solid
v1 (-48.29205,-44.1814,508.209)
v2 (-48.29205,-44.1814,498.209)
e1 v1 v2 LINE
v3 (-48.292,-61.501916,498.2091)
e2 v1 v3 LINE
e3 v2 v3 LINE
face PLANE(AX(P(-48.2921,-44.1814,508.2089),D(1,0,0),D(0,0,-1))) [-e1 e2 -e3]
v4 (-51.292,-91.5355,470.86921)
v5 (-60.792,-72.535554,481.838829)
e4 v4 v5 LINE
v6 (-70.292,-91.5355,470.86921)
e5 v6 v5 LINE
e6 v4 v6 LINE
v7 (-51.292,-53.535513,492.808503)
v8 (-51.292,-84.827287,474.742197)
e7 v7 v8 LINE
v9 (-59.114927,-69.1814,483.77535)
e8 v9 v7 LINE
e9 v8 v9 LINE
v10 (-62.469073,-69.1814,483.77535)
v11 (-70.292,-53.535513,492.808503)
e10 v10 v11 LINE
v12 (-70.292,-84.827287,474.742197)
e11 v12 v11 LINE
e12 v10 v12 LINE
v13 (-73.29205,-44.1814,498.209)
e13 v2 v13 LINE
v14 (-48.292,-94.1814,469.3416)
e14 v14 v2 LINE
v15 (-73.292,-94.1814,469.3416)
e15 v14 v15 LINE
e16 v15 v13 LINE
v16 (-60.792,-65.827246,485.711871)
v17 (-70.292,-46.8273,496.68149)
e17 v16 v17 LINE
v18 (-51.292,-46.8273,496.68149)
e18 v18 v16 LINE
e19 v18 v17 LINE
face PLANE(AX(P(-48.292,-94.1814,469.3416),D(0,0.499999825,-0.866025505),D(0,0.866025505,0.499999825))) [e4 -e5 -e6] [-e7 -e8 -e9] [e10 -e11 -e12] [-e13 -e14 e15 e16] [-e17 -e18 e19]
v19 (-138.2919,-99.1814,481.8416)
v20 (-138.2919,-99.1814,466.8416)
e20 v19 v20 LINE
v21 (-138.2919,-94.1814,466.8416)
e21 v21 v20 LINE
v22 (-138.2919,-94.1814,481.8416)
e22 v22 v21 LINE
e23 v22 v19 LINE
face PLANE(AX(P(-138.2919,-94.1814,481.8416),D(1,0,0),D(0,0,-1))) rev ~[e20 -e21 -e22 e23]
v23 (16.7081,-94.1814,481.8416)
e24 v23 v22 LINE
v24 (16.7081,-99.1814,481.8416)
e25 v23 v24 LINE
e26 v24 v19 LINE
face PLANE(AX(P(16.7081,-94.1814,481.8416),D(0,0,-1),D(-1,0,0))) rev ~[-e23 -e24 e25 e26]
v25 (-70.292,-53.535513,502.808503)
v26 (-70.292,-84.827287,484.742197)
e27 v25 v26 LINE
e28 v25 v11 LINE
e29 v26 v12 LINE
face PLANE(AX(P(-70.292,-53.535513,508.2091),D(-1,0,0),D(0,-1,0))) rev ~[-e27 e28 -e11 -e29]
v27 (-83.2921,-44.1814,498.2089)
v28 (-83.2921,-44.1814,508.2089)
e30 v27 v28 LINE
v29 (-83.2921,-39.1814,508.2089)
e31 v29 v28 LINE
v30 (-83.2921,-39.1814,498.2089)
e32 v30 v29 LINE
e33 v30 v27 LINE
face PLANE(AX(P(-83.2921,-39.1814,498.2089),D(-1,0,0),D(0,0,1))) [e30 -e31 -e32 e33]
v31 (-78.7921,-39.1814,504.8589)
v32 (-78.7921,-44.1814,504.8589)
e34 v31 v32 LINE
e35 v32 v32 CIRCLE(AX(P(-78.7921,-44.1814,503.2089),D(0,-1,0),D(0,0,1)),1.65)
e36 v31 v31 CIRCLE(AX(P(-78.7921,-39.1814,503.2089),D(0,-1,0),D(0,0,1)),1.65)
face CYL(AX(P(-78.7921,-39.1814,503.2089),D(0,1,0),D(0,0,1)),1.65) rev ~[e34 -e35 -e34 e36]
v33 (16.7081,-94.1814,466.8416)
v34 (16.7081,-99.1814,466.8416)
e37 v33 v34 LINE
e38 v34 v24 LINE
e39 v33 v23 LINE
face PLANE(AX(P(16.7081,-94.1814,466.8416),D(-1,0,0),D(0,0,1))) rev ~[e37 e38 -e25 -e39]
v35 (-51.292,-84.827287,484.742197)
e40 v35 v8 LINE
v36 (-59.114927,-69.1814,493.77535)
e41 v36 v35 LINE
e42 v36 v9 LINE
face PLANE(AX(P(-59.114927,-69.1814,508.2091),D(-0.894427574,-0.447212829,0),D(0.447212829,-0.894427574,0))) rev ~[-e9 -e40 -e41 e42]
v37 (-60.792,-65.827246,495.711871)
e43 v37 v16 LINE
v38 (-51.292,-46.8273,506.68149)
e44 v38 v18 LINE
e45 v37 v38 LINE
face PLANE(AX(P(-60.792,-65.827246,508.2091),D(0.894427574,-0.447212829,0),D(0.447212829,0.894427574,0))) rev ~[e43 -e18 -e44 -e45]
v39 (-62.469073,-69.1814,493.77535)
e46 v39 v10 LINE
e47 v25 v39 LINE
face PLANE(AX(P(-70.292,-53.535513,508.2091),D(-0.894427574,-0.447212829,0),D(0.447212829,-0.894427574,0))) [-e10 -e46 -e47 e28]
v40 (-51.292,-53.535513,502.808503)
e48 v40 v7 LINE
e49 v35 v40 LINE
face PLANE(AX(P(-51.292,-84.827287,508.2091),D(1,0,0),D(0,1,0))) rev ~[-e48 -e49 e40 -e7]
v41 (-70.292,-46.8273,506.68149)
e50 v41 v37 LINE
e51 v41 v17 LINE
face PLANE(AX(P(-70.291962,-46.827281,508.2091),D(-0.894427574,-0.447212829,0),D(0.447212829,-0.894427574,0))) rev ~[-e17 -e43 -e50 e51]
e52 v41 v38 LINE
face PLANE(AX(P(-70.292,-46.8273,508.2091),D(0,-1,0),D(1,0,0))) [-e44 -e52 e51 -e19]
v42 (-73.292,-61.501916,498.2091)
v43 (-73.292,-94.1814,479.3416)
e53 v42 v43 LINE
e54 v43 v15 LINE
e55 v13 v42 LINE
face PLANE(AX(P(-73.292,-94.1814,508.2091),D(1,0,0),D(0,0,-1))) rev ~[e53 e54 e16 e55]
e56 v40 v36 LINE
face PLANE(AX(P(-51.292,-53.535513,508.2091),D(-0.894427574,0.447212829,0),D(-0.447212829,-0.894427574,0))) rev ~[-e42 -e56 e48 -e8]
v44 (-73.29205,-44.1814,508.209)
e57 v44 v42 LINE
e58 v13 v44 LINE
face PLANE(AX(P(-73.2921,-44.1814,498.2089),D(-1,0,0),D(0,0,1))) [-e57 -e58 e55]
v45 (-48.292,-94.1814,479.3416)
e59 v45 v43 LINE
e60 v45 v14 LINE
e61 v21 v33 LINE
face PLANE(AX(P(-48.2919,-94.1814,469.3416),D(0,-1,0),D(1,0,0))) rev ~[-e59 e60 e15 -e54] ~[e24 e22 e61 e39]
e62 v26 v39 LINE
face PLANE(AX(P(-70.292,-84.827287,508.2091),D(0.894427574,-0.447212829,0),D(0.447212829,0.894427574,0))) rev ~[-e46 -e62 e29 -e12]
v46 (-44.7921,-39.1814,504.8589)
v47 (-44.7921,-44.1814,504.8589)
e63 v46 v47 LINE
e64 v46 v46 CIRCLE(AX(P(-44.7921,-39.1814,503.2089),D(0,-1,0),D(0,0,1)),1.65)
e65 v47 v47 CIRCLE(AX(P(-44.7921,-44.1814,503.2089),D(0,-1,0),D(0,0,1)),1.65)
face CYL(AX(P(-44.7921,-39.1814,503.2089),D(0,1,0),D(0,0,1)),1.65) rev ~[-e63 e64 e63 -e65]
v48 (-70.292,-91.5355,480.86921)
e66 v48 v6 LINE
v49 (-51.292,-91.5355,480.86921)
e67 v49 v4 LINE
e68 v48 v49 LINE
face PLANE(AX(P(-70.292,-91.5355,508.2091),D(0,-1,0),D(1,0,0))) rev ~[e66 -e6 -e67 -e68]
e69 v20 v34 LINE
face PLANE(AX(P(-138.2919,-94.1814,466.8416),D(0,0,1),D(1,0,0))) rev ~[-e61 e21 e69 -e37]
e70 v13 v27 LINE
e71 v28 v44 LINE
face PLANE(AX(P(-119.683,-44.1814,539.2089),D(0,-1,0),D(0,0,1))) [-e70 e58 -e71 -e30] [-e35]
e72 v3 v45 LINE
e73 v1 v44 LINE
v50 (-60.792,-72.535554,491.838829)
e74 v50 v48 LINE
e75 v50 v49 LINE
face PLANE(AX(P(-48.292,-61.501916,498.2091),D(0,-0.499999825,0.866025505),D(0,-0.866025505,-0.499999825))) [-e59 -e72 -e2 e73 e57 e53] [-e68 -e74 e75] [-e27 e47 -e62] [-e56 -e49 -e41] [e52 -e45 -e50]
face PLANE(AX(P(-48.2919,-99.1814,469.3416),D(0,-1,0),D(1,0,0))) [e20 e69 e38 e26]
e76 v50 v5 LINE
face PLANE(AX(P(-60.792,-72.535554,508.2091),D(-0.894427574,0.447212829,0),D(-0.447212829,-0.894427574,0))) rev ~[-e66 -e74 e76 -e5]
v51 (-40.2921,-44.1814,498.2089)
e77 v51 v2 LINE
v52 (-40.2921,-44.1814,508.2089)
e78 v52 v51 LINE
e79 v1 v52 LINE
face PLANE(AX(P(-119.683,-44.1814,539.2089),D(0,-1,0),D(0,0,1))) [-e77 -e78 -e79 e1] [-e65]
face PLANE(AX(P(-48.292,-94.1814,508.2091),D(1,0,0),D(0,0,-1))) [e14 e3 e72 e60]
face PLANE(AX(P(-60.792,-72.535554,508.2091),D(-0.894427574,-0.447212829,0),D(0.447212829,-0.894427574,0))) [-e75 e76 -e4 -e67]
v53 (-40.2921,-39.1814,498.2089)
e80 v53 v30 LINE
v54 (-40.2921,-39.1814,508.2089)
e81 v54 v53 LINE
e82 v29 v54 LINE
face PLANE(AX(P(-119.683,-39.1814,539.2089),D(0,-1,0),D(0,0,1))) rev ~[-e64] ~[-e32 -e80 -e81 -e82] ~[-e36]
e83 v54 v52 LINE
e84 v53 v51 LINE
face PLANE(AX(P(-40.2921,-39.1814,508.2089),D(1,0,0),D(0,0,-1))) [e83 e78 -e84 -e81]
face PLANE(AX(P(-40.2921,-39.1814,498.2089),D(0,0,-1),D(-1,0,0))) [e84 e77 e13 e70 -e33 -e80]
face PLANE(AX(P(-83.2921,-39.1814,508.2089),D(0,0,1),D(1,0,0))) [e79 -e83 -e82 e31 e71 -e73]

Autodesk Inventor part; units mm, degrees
ref_plane "YZ Plane" through (0, 0, 0) normal (1, 0, 0) x (0, 1, 0)
ref_plane "XZ Plane" through (0, 0, 0) normal (0, 1, 0) x (-1, 0, 0)
ref_plane "XY Plane" through (0, 0, 0) normal (0, 0, 1) x (1, 0, 0)
ref_plane "工作平面2" through (-119.683, -39.1814, 539.2089) normal (0, -1, 0) x (-0.0000021, 0, 1)
sketch "草图2" plane through (-119.683, -39.1814, 539.2089) normal (0, -1, 0) x (-0.0000021, 0, 1)
  line L0 (-31, -79.3909) -> (-41, -79.3909)
  line L1 (-41, -79.3909) -> (-41, -36.3909)
  line L2 (-41, -36.3909) -> (-31, -36.3909)
  line L3 (-31, -36.3909) -> (-31, -79.3909)
  circle A0 centre (-36, -74.8909) radius 1.65 projected
  circle A1 centre (-36, -40.8909) radius 1.65 projected
  point P0 (-539.2092, -119.6818)
  point P1 (0, 0)
  dimension "d0" = 10
  dimension "d1" = 43
  dimension "d2" = 5
  dimension "d3" = 4.5
extrude "拉伸1" add sketch "草图2" along normal blind 5
ref_plane "工作平面3" through (-119.683, -44.1814, 539.2089) normal (0, -1, 0) x (1, 0, 0.0000021)
sketch "草图4" plane through (-119.683, -44.1814, 539.2089) normal (0, -1, 0) x (1, 0, 0.0000021)
  line L0 (36.3909, -41) -> (79.3909, -41) projected
  line L1 (79.3909, -31) -> (36.3909, -31) projected
  line L2 (71.3909, -41) -> (46.3909, -41)
  line L3 (46.3909, -41) -> (46.3909, -31)
  line L4 (46.3909, -31) -> (71.3909, -31)
  line L5 (71.3909, -31) -> (71.3909, -41)
  line L6 (36.3909, -31) -> (36.3909, -41) projected
  point P0 (119.6818, -539.2092)
  point P1 (71.3909, -31)
  point P2 (46.3909, -41)
  dimension "d10" = 25
  dimension "d11" = 10
extrude "拉伸4" add sketch "草图4" along normal blind 50 contours L3 L1 L5 L0
sketch "草图5" plane through (-48.292, -94.1814, 508.2091) normal (1, 0, 0.0000021) x (0.0000021, 0, -1)
  line L0 (0, 50) -> (10, 50) projected
  line L1 (0, 50) -> (0, 0) projected
  line L2 (10, 0) -> (0, 0) projected
  line L3 (10, 50) -> (10, 0) projected
  line L4 (0, 50) -> (28.8675, 0)
  line L5 (28.8675, 0) -> (38.8675, 0)
  line L6 (38.8675, 0) -> (10, 50)
  point P0 (508.2092, 94.1814)
  point P1 (10, 32.6795)
  dimension "d29" = 30
extrude "拉伸5" add sketch "草图5" against normal blind 25 contours L6 L5 L4 L3
extrude "拉伸6" cut sketch "草图5" against normal blind 25 contours L4 L3 L2 L1
ref_plane "工作平面4" through (-40.292, -44.1814, 508.2091) normal (-0.0000021, 0, 1) x (1, 0, 0.0000021)
sketch "草图7" plane through (-40.292, -44.1814, 508.2091) normal (-0.0000021, 0, 1) x (1, 0, 0.0000021)
  line L0 (-8, 0) -> (-8, -50) projected
  line L1 (-33, 0) -> (-8, 0) projected
  line L2 (-33, -50) -> (-33, 0) projected
  line L3 (-8, -50) -> (-33, -50) projected
  line L4 (-40.6091, 5) -> (-2.3909, 5) projected
  line L5 (-33, 0) -> (-8, 0) projected
  line L6 (0, 0) -> (-8, 0) projected
  line L7 (0, 5) -> (0, 0) projected
  line L8 (0, 5) -> (-43, 5) projected
  line L9 (-43, 5) -> (-43, 0) projected
  line L10 (-33, 0) -> (-43, 0) projected
  line L11 (-8, 0) -> (-33, 0) projected
  line L12 (-33, 0) -> (-8, -50)
  line L13 (-33, -50) -> (-8, 0)
  line L14 (-31.3229, 0) -> (-8, -46.6459)
  line L15 (-33, -3.3541) -> (-9.6771, -50)
  line L16 (-33, -50) -> (-33, 0) projected
  line L17 (-33, -46.6459) -> (-9.6771, 0)
  line L18 (-8, -50) -> (-8, 0) projected
  line L19 (-8, -3.3541) -> (-31.3229, -50)
  line L20 (-30, 0) -> (-30, -50)
  line L21 (-11, -50) -> (-11, 0)
  line L22 (-30, -47.3541) -> (-11, -47.3541)
  line L23 (-30, -2.6459) -> (-11, -2.6459)
  point P0 (40.291, 44.1814)
  point P1 (-33, -46.6459)
  point P2 (-22.1771, -25)
  point P3 (-20.5, -28.3541)
  point P4 (-8, -3.3541)
  point P5 (-18.8229, -25)
  point P6 (-20.5, -21.6459)
  point P7 (-9.6771, 0)
  point P8 (-31.3229, 0)
  point P9 (-11, -40.6459)
  point P10 (-11, -9.3541)
  point P11 (-30, -9.3541)
  point P12 (-30, -40.6459)
  point P13 (-11, -2.6459)
  point P14 (-11, 0)
  point P15 (-30, 0)
  point P16 (-30, -2.6459)
  point P17 (-11, -47.3541)
  point P18 (-30, -47.3541)
  dimension "d44" = 1.5
  dimension "d45" = 1.5
  dimension "d47" = 3
  dimension "d48" = 3
extrude "拉伸8" cut sketch "草图7" against normal blind 50 contours L21 L14 L19 | L17 L14 L23 | L22 L19 L15 | L17 L20 L15
ref_plane "工作平面5" through (-48.2919, -94.1814, 469.3416) normal (0, -1, 0) x (1, 0, 0.0000021)
sketch "草图8" plane through (-48.2919, -94.1814, 469.3416) normal (0, -1, 0) x (1, 0, 0.0000021)
  line L0 (0, 10) -> (0, 0) construction
  line L1 (-25, 0) -> (-25, 10) construction
  line L2 (-90, -2.5) -> (65, -2.5)
  line L3 (65, -2.5) -> (65, 12.5)
  line L4 (65, 12.5) -> (-90, 12.5)
  line L5 (-90, 12.5) -> (-90, -2.5)
  line L6 (0, 10) -> (-25, 10) projected
  line L7 (0, 0) -> (-25, 0) projected
  line L8 (0, 10) -> (-25, 10) projected
  line L9 (0, 0) -> (-25, 0) projected
  point P0 (48.291, -469.3417)
  dimension "d40" = 155
  dimension "d41" = 65
  dimension "d49" = 15
  dimension "d50" = 2.5
extrude "拉伸9" add sketch "草图8" along normal blind 5
properties part number "起落架 新"
